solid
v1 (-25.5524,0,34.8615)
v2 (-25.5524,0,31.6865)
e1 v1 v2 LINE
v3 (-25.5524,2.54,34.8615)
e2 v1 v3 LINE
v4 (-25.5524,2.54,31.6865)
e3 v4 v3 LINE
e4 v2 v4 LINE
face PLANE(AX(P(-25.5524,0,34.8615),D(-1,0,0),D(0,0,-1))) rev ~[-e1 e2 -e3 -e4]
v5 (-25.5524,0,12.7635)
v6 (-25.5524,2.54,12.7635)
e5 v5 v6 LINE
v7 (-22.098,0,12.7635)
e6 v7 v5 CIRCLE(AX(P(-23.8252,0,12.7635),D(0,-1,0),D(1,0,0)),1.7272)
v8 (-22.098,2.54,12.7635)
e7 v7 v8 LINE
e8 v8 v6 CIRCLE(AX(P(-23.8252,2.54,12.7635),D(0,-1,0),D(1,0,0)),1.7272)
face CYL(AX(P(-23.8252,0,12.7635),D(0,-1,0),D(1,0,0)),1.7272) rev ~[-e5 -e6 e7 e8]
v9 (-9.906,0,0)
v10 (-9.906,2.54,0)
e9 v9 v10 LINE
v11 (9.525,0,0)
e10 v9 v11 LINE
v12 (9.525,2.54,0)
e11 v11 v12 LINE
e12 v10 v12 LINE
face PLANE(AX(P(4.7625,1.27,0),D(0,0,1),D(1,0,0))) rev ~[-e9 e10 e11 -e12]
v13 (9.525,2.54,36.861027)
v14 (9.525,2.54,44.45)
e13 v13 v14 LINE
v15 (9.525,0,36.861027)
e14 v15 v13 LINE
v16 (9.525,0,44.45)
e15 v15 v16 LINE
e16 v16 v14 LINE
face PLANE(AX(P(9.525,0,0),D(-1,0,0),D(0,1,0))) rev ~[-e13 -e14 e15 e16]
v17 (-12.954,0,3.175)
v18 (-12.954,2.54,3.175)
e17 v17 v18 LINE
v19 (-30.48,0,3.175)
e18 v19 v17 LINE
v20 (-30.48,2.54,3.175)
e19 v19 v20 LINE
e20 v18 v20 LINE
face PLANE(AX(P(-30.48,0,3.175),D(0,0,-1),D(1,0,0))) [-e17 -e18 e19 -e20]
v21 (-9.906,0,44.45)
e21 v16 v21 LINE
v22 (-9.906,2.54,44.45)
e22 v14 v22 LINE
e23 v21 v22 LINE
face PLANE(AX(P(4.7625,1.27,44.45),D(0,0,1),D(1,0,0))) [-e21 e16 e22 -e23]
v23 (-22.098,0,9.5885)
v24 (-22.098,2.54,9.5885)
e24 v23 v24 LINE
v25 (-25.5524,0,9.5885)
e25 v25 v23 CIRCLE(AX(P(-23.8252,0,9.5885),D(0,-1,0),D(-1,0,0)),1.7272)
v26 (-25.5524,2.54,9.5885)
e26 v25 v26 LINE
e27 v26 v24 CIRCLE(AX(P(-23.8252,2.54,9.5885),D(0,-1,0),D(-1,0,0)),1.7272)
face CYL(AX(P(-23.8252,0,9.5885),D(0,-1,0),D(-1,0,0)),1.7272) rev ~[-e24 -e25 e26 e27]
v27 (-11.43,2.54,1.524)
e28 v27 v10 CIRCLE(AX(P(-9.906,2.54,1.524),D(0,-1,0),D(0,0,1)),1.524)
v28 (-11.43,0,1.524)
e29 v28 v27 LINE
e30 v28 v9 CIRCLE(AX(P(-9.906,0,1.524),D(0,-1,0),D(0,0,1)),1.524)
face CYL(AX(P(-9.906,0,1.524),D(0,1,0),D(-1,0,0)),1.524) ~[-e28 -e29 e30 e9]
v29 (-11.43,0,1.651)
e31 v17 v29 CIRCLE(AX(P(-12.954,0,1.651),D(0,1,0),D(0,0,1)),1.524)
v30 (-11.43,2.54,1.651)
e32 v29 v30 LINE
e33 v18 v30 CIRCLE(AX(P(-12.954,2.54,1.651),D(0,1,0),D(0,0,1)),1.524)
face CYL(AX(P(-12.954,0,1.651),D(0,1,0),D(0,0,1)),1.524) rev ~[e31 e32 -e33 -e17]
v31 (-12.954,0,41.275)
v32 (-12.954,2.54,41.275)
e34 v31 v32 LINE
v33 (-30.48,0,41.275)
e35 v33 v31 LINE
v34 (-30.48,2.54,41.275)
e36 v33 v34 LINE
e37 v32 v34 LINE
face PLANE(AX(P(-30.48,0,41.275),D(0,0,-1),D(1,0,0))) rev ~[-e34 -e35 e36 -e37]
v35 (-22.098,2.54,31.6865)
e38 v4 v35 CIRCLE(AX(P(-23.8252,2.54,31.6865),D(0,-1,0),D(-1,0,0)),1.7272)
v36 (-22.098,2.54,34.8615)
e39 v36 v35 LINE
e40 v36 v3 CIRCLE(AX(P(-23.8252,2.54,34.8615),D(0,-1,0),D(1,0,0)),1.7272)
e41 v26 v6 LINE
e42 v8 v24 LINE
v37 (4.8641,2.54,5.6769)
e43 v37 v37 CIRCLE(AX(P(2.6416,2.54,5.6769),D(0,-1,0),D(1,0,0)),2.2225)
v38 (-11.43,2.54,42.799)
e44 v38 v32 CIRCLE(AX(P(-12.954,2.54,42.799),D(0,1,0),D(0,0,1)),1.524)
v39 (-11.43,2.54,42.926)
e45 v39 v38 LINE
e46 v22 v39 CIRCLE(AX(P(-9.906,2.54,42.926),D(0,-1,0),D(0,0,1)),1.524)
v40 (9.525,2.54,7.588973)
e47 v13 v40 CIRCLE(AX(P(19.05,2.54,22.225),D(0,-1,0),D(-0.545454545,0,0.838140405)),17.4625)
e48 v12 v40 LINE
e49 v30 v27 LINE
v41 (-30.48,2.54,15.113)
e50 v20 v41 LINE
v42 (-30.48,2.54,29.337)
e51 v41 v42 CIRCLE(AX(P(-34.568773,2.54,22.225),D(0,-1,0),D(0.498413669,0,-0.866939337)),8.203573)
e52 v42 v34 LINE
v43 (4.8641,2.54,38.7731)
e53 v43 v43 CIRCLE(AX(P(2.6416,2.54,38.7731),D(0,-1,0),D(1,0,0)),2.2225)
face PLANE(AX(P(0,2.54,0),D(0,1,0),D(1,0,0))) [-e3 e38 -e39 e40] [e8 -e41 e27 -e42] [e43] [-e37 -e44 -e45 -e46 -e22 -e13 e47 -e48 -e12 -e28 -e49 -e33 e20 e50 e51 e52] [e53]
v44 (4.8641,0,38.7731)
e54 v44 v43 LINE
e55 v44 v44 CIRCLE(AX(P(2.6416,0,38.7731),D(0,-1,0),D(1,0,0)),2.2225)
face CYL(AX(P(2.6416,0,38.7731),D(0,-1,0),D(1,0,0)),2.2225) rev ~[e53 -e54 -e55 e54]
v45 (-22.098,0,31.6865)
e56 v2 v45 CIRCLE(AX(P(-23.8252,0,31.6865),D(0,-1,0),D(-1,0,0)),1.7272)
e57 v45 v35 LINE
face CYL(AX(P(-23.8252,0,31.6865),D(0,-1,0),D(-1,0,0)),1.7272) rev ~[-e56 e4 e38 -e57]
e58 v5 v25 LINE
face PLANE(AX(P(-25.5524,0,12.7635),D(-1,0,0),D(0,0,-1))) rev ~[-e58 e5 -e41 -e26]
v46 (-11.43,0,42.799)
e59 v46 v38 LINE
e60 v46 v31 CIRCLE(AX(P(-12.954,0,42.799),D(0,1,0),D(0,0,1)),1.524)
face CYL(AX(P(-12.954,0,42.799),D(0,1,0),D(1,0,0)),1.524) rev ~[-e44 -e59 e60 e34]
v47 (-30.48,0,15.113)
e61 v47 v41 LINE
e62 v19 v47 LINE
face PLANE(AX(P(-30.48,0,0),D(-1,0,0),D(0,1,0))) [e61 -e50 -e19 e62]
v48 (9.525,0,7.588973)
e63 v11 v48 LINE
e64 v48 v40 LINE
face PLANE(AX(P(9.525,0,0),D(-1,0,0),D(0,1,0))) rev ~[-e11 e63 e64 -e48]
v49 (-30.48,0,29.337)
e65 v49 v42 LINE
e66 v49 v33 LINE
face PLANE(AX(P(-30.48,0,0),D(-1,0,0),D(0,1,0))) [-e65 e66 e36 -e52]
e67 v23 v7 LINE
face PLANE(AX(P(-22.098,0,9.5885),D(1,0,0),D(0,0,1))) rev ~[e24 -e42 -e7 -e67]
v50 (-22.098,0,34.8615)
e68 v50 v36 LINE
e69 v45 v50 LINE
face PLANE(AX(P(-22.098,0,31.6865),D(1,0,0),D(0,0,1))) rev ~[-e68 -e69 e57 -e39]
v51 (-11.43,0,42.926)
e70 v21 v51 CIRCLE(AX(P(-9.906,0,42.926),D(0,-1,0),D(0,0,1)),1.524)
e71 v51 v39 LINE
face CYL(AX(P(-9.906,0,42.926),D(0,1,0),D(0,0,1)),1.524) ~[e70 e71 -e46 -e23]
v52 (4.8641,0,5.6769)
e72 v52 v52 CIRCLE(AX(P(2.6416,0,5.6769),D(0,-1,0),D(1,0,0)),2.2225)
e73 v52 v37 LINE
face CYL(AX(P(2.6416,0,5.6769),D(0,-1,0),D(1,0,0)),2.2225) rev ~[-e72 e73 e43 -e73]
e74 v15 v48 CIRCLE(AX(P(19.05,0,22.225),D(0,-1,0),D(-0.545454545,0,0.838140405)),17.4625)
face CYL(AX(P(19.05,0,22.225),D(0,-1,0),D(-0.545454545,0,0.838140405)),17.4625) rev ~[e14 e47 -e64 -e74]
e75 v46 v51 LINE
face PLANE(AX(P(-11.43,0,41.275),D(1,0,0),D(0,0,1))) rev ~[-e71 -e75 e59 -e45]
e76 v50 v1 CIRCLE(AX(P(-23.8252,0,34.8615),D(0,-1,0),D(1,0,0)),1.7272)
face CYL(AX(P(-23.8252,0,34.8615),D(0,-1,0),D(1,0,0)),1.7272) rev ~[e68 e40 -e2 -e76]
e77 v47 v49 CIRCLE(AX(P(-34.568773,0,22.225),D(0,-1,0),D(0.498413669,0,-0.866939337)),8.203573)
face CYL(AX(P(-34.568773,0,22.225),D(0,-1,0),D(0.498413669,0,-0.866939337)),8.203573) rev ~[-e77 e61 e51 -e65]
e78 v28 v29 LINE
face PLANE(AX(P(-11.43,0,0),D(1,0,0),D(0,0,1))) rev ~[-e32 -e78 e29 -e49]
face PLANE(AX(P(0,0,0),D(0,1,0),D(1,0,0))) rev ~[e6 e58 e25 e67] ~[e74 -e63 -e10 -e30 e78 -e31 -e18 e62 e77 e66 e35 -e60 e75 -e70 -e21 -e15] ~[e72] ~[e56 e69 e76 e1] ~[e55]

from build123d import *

# Parameters (mm, degrees)
F0_W     = 30.48
F0_H     = 2.54
F1_DEPTH = 44.45
F0_W_2   = 9.525
F3_DEPTH = 44.45
F4_R     = 2.2225
F5_DEPTH = 25.4
F2_W     = 19.05
F2_H     = 3.175
F6_DEPTH = 25.4
F7_R     = 1.524


# Not quite as in the source:
# - a feature names something its author has since deleted; it is built from what else it names


with BuildPart() as f1:
    # F0 (on Top) → F1 (new body)
    with BuildSketch(Plane.XY):
        with Locations((-15.24, 1.27)):
            Rectangle(F0_W, F0_H)
    extrude(amount=F1_DEPTH)

    # F0 (on Top) → F3 (join)
    with BuildSketch(Plane.XY):
        with Locations((4.7625, 1.27)):
            Rectangle(F0_W_2, F0_H)
    extrude(amount=F3_DEPTH)

    # F4 (on face) + F2 (on face) → F5 (cut)
    with BuildSketch(Plane.XZ):
        with Locations((2.6416, 38.7731)):
            Circle(F4_R)
        with Locations((2.6416, 5.6769)):
            Circle(F4_R)
        with BuildLine():
            Line((9.525, 7.588973174), (9.525, 36.861026826))
            ThreePointArc((9.525, 36.861026826), (1.5875, 22.225), (9.525, 7.588973174))
        make_face()
    with BuildSketch(Plane.XZ):
        with BuildLine():
            Line((-22.098, 9.5885), (-22.098, 12.7635))
            ThreePointArc((-22.098, 12.7635), (-23.8252, 14.4907), (-25.5524, 12.7635))
            Line((-25.5524, 12.7635), (-25.5524, 9.5885))
            ThreePointArc((-25.5524, 9.5885), (-23.8252, 7.8613), (-22.098, 9.5885))
        make_face()
        with BuildLine():
            Line((-22.098, 31.6865), (-22.098, 34.8615))
            ThreePointArc((-22.098, 34.8615), (-23.8252, 36.5887), (-25.5524, 34.8615))
            Line((-25.5524, 34.8615), (-25.5524, 31.6865))
            ThreePointArc((-25.5524, 31.6865), (-23.8252, 29.9593), (-22.098, 31.6865))
        make_face()
        with BuildLine():
            Line((-30.48, 29.337), (-30.48, 15.113))
            ThreePointArc((-30.48, 15.113), (-26.3652, 22.225), (-30.48, 29.337))
        make_face()
    extrude(amount=-F5_DEPTH, mode=Mode.SUBTRACT)

    # F2 (on face) → F6 (cut)
    with BuildSketch(Plane.XZ):
        with Locations((-20.955, 42.8625)):
            Rectangle(F2_W, F2_H)
        with Locations((-20.955, 1.5875)):
            Rectangle(F2_W, F2_H)
    extrude(amount=-F6_DEPTH, mode=Mode.SUBTRACT)

    # F7
    f7_edges = [f1.edges().sort_by_distance(p)[0] for p in [
        (-11.43, 1.27, 41.275),
        (-11.43, 1.27, 44.45),
        (-11.43, 1.27, 0),
        (-11.43, 1.27, 3.175),
    ]]
    fillet(f7_edges, radius=F7_R)


solid = f1.part
